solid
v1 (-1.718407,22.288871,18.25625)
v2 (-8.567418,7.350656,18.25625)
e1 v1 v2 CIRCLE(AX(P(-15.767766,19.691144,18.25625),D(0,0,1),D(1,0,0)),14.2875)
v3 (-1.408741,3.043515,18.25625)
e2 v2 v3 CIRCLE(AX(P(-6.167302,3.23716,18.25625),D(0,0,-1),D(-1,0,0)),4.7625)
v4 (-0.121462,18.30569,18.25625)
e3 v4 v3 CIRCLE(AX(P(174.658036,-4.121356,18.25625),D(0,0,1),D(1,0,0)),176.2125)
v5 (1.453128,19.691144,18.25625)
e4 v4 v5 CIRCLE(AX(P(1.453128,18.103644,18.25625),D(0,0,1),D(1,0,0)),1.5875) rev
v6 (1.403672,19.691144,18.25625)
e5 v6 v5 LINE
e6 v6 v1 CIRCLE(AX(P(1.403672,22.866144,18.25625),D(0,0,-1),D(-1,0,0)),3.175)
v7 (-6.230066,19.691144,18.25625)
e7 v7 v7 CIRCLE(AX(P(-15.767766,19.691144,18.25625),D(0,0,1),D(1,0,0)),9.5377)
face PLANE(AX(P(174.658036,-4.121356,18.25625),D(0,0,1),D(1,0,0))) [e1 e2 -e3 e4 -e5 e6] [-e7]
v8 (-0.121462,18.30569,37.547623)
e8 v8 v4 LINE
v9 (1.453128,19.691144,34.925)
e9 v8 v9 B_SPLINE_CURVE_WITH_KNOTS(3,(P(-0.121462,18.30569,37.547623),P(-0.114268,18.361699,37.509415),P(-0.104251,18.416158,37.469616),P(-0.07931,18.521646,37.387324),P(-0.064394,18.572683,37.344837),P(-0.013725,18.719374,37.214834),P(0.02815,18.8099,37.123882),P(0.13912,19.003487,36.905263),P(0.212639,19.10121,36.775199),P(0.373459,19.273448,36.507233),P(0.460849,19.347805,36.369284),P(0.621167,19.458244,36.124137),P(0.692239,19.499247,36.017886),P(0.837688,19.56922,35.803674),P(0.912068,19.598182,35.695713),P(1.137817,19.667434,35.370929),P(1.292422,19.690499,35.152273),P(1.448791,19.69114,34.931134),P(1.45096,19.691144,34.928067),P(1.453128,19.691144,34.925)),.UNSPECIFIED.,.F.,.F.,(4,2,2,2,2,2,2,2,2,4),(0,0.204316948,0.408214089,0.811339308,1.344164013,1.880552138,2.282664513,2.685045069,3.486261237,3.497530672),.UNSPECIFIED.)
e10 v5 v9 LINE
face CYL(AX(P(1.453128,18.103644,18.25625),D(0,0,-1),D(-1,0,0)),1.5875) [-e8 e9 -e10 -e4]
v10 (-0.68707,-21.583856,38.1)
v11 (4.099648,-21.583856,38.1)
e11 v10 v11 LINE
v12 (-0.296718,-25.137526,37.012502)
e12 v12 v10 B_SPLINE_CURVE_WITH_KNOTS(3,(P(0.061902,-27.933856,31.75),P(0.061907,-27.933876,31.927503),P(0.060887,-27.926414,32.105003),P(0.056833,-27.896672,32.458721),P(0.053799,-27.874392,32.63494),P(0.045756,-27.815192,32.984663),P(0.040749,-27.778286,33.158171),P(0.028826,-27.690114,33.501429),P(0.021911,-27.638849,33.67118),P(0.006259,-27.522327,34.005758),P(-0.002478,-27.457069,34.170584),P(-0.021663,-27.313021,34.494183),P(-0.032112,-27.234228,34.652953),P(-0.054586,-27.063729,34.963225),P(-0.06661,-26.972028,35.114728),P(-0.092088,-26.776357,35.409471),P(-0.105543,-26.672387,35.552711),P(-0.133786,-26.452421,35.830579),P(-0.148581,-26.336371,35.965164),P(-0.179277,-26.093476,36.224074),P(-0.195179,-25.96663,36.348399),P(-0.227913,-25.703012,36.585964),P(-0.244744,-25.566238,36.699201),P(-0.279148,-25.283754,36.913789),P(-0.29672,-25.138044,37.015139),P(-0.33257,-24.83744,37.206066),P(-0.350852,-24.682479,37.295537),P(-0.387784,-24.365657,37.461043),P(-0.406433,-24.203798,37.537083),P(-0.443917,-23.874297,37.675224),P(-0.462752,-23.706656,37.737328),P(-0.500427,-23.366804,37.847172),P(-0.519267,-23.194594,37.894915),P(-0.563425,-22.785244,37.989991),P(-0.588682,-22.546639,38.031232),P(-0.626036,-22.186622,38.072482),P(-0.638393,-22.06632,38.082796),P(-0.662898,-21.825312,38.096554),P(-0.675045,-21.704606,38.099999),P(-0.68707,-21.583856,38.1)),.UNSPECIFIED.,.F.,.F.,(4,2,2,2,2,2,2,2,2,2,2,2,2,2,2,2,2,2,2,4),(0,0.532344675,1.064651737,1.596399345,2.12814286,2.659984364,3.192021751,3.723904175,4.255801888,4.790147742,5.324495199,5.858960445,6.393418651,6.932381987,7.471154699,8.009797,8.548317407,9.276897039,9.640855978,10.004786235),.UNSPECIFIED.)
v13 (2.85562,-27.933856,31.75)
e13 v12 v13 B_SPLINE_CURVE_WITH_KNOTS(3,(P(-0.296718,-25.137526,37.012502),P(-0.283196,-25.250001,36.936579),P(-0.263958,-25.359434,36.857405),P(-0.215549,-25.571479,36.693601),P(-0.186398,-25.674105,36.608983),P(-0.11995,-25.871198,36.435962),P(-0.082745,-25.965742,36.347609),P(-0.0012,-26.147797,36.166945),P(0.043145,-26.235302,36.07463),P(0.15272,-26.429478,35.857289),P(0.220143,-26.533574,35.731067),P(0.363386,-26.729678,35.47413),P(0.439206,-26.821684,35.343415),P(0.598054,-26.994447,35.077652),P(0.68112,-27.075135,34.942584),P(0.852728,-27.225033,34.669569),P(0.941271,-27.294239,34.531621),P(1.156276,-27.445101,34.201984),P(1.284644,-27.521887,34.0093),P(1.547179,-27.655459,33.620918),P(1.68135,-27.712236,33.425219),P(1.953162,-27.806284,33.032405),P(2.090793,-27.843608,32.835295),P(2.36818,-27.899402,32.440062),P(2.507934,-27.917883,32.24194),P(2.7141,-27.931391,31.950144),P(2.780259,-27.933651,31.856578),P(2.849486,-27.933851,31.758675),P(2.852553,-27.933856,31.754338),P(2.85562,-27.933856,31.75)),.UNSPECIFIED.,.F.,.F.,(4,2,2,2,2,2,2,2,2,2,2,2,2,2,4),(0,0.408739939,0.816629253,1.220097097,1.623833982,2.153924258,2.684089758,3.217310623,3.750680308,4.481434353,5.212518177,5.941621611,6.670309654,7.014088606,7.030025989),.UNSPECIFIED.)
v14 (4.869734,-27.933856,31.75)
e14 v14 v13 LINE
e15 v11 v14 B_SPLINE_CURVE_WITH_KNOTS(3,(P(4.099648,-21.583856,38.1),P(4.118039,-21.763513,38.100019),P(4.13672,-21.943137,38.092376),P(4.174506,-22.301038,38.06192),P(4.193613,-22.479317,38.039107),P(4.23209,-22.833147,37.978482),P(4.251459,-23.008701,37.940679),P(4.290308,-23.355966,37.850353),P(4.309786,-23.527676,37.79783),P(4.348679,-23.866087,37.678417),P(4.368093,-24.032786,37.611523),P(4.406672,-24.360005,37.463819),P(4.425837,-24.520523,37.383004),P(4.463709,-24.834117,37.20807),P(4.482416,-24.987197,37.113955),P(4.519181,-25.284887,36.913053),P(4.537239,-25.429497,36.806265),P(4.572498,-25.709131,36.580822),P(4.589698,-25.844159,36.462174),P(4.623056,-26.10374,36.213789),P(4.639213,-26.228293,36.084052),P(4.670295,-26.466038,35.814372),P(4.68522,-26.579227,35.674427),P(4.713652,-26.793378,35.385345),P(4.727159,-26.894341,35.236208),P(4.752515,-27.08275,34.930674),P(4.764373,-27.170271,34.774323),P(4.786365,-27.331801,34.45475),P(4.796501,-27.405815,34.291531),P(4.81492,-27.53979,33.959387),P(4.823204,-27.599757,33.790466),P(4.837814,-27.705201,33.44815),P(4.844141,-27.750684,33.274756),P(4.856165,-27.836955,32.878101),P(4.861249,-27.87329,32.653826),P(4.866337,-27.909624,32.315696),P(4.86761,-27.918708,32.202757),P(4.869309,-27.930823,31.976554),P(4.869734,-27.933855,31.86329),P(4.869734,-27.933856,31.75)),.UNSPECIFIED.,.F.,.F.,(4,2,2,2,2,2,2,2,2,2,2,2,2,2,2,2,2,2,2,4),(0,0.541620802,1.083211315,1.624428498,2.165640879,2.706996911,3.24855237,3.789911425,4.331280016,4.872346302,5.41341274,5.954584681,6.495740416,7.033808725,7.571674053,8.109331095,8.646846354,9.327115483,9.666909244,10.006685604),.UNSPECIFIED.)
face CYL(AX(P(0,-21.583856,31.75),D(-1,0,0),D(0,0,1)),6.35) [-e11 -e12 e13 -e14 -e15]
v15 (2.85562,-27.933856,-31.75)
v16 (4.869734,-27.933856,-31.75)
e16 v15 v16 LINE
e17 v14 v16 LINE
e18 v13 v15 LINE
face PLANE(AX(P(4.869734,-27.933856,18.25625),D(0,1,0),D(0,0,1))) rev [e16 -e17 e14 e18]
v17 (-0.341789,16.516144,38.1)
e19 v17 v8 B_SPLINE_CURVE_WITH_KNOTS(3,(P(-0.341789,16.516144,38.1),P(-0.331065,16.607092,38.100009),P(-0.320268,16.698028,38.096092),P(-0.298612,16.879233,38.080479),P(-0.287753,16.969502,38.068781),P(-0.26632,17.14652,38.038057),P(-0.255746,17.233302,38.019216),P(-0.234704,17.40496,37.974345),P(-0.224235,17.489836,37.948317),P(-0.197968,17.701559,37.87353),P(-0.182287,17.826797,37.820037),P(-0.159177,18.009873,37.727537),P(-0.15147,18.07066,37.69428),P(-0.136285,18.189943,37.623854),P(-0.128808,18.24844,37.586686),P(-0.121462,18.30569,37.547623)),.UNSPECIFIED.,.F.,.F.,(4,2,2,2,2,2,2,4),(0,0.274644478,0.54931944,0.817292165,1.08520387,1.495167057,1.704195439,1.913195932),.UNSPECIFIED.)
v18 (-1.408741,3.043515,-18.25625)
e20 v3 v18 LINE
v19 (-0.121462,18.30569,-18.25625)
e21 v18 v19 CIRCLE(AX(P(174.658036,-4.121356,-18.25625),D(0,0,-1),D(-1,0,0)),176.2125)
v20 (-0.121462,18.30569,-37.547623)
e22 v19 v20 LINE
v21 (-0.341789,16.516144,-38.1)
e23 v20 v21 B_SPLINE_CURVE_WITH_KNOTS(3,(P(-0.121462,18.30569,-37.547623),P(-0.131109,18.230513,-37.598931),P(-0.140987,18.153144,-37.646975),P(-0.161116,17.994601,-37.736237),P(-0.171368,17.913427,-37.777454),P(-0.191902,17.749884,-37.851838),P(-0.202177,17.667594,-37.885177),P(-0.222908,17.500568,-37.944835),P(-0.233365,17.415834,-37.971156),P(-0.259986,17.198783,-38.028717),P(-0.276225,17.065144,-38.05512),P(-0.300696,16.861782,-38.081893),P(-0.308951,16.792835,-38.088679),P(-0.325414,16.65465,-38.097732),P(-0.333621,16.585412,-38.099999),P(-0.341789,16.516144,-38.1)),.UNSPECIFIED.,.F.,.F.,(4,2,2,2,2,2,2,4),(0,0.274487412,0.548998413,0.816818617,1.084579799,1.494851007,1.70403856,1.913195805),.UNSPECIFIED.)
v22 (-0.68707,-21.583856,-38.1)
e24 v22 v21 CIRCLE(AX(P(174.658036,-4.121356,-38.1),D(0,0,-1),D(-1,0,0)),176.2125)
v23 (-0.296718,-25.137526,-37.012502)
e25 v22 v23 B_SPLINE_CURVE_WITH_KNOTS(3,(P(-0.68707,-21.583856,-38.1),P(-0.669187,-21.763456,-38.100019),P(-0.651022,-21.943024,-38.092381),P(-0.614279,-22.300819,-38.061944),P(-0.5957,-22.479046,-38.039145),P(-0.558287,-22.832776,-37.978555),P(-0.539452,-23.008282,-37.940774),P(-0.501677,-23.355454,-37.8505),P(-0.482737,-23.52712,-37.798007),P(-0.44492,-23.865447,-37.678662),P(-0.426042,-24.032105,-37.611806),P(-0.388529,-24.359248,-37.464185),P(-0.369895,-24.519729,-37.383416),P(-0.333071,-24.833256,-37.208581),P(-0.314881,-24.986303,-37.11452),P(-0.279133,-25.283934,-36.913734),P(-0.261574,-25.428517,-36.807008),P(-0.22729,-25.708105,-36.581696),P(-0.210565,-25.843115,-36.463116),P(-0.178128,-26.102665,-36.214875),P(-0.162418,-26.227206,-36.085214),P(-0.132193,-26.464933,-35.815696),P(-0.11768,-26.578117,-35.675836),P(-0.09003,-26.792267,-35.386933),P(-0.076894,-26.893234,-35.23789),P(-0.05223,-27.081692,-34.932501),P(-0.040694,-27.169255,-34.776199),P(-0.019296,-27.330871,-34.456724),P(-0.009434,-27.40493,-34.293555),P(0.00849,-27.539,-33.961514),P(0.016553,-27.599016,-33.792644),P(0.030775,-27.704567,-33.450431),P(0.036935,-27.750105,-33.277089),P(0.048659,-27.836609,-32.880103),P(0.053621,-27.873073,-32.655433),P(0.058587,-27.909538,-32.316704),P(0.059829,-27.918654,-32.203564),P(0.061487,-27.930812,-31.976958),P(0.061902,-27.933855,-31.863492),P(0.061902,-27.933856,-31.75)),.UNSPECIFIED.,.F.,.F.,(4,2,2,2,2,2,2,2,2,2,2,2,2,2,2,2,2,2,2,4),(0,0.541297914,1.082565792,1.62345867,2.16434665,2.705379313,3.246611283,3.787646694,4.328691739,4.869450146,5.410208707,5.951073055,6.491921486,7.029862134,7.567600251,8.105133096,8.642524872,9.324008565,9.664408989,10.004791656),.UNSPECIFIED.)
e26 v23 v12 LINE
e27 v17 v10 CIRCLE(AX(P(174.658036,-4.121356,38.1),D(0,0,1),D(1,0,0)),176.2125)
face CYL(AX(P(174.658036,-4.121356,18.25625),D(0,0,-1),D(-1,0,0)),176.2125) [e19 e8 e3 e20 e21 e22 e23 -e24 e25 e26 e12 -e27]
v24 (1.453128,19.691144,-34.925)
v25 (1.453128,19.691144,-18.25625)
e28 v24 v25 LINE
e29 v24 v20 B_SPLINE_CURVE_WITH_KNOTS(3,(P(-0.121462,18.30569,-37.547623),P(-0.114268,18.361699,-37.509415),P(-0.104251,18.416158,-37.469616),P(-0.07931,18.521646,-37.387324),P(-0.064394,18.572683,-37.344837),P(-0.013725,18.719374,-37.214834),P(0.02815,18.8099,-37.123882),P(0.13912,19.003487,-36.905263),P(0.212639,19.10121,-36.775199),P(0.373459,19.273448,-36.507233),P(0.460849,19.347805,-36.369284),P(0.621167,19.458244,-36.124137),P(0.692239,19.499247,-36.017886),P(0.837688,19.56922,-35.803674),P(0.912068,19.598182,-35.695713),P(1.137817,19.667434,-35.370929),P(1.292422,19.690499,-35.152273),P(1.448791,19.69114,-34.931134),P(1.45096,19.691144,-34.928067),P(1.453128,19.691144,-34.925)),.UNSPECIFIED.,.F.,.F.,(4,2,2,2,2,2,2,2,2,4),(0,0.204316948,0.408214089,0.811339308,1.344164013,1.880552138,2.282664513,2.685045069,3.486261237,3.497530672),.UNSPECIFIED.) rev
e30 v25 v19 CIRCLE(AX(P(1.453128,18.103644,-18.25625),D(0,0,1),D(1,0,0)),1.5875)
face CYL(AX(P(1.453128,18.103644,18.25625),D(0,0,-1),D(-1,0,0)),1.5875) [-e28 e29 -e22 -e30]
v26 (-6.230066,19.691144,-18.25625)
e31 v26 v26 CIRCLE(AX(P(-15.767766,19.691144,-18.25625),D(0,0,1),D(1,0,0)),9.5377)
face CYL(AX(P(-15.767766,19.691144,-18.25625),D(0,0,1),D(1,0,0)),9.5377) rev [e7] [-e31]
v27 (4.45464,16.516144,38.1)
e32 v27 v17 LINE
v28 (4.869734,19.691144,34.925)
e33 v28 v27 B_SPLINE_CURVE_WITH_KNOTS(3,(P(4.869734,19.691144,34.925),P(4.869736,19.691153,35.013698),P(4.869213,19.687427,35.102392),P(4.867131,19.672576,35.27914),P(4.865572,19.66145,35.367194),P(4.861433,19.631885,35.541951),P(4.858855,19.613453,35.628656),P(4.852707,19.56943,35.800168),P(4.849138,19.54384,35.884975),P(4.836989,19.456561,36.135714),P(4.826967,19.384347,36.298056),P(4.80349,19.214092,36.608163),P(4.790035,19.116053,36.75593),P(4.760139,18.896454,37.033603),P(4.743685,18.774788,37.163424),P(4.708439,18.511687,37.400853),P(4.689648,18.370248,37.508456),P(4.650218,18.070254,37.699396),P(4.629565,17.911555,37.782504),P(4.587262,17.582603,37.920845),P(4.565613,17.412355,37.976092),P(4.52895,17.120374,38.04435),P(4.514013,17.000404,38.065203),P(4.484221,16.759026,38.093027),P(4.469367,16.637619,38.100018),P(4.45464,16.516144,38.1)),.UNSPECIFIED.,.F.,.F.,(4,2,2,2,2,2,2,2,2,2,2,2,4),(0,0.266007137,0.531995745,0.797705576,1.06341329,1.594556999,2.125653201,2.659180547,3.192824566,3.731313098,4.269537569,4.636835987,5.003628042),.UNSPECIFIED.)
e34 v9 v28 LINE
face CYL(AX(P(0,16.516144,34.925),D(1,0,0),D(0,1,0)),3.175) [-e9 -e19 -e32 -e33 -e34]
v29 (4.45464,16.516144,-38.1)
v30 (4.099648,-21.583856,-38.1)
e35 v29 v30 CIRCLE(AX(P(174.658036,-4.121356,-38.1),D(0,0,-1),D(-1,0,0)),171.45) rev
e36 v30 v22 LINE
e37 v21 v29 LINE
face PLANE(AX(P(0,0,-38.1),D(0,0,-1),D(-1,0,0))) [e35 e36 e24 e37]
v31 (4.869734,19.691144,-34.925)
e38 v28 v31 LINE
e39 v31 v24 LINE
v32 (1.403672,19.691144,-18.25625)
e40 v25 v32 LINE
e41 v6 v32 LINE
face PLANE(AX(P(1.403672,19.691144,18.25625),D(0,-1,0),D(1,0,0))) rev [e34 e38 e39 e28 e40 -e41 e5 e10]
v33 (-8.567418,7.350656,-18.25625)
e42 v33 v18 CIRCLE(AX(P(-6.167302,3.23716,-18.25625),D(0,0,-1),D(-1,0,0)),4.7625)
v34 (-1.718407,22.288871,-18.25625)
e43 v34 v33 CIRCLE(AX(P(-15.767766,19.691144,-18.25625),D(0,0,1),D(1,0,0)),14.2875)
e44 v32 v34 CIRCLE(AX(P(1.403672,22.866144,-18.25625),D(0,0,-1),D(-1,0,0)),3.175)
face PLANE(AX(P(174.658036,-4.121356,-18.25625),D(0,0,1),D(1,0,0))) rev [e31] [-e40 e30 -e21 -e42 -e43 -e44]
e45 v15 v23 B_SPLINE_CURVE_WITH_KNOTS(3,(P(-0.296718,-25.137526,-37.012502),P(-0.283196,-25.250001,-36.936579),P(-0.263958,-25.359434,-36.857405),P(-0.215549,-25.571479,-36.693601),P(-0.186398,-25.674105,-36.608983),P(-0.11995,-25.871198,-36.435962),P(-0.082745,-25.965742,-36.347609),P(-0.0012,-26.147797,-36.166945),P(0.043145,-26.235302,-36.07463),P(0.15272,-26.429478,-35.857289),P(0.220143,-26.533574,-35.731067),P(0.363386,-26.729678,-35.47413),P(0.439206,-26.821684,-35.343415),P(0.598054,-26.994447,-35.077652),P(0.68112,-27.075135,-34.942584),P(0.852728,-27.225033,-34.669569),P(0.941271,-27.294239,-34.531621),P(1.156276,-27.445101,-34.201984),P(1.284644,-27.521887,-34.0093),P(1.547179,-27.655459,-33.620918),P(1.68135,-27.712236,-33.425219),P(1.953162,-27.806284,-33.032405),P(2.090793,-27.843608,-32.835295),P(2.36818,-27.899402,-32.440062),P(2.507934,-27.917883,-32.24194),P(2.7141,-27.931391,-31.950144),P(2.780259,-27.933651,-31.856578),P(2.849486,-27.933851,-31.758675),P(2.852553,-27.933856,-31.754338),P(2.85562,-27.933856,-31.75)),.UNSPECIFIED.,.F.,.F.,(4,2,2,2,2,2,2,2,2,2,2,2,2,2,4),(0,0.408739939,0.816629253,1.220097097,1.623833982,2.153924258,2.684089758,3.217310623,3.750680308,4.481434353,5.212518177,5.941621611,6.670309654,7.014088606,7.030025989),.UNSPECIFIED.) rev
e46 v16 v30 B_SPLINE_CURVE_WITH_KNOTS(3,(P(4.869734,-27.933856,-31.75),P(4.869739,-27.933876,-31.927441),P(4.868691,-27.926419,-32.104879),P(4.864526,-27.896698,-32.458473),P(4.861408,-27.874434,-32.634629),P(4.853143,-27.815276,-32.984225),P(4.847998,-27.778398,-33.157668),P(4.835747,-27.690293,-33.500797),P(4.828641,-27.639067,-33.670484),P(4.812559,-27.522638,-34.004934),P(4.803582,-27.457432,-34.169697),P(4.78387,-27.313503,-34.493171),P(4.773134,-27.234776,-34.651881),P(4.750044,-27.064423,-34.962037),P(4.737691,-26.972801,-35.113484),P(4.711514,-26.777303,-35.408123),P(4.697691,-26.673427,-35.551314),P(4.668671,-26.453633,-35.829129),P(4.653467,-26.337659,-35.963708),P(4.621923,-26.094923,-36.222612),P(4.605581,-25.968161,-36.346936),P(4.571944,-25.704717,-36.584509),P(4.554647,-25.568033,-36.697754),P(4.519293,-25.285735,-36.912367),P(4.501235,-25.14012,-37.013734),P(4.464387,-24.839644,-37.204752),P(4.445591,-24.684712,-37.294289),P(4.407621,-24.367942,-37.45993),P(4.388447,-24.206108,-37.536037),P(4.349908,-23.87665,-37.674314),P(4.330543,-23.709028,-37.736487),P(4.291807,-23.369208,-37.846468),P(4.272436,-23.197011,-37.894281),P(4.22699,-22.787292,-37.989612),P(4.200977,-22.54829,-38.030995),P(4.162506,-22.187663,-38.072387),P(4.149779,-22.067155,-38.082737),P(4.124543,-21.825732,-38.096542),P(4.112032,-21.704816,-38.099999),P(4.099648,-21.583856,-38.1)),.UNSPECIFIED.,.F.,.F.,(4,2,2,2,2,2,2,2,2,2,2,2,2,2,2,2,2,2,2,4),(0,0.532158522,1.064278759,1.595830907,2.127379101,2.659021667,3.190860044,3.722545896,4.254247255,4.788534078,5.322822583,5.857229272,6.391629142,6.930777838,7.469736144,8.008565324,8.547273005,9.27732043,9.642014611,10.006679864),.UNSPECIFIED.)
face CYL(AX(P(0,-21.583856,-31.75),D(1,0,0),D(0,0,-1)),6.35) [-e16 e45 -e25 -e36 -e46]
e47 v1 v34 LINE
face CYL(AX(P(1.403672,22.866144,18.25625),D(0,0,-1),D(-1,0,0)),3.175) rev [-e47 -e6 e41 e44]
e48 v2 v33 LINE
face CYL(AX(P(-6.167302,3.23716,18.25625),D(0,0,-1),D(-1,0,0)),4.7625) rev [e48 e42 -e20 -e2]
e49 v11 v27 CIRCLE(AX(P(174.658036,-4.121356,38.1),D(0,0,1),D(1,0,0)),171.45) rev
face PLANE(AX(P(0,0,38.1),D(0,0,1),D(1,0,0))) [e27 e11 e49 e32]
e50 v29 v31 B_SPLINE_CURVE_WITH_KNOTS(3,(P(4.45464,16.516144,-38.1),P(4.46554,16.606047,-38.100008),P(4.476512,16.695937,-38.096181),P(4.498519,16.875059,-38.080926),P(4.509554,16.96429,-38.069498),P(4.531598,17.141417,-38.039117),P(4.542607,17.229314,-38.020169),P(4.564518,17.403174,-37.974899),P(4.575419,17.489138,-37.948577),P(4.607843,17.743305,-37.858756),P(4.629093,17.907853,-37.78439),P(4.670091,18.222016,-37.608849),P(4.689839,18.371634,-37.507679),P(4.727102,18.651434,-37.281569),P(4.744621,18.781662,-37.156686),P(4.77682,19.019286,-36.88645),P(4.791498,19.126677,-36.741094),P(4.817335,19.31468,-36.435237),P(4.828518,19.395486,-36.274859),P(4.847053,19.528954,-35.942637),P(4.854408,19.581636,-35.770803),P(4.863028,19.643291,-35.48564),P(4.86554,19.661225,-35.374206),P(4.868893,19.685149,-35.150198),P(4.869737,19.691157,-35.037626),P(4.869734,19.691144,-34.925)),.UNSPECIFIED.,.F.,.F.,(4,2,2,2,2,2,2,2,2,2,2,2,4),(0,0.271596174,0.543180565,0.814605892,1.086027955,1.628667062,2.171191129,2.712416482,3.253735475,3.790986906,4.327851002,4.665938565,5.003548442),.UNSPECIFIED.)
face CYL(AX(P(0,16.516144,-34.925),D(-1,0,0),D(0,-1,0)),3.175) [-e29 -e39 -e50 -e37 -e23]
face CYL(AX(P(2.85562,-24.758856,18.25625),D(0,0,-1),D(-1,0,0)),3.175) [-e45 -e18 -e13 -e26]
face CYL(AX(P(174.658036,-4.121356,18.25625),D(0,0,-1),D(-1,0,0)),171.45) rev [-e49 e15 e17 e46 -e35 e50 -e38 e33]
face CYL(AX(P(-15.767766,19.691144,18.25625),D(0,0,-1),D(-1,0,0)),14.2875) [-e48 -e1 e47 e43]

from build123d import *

# Parameters (mm, degrees)
BOSS_EXTRUDE1_DEPTH = 18.25625
SKETCH2_R           = 9.5377
CUT_EXTRUDE1_DEPTH  = 59.232550302
BOSS_EXTRUDE2_START = 19.84375
BOSS_EXTRUDE2_DEPTH = 19.84375
BOSS_EXTRUDE3_DEPTH = 19.84375
FILLET2_R           = 6.35
FILLET3_R           = 3.175
FILLET5_R           = 1.5875
FILLET6_R           = 3.175


with BuildPart() as part:
    # Sketch1 → Boss-Extrude1 (new, symmetric)
    with BuildSketch(Plane.XY):
        with BuildLine():
            Line((1.403672164, 19.691144131), (4.869734215, 19.691144131))
            ThreePointArc((4.869734215, 19.691144131), (3.208035766, -4.121355869), (4.869734215, -27.933855869))
            Line((4.869734215, -27.933855869), (0.061901788, -27.933855869))
            ThreePointArc((0.061901788, -27.933855869), (-1.356220949, -12.477586426), (-1.408740732, 3.043514659))
            ThreePointArc((-1.408740732, 3.043514659), (-3.712015543, 7.317965291), (-8.567418141, 7.350655889))
            ThreePointArc((-8.567418141, 7.350655889), (-28.755262527, 25.645771293), (-1.718407463, 22.288871403))
            ThreePointArc((-1.718407463, 22.288871403), (-0.627064659, 20.425502216), (1.403672164, 19.691144131))
        make_face()
    extrude(amount=BOSS_EXTRUDE1_DEPTH, both=True)

    # Sketch2 → Cut-Extrude1 (cut, through all)
    with BuildSketch(Plane.XY.offset(18.25625)):
        with Locations((-15.767765785, 19.691144131)):
            Circle(SKETCH2_R)
    extrude(amount=-CUT_EXTRUDE1_DEPTH, mode=Mode.SUBTRACT)

    # Sketch4 → Boss-Extrude2 (add)
    with BuildSketch(Plane.XY.offset(18.25625).offset(BOSS_EXTRUDE2_START)):
        with BuildLine():
            ThreePointArc((-1.408740732, 3.043514659), (-1.356220949, -12.477586426), (0.061901788, -27.933855869))
            Line((0.061901788, -27.933855869), (4.869734215, -27.933855869))
            ThreePointArc((4.869734215, -27.933855869), (3.208035766, -4.121355869), (4.869734215, 19.691144131))
            Line((4.869734215, 19.691144131), (1.403672164, 19.691144131))
            ThreePointArc((1.403672164, 19.691144131), (0.737132208, 19.761897123), (0.100299146, 19.971002722))
            ThreePointArc((0.100299146, 19.971002722), (-0.858408657, 11.525461487), (-1.408740732, 3.043514659))
        make_face()
    extrude(amount=-BOSS_EXTRUDE2_DEPTH)

    # Sketch5 → Boss-Extrude3 (add)
    with BuildSketch(Plane(origin=(0, 0, -18.25625), x_dir=(-1, 0, 0), z_dir=(0, 0, -1))):
        with BuildLine():
            ThreePointArc((-4.869734215, 19.691144131), (-3.208035766, -4.121355869), (-4.869734215, -27.933855869))
            Line((-4.869734215, -27.933855869), (-0.061901788, -27.933855869))
            ThreePointArc((-0.061901788, -27.933855869), (1.356220949, -12.477586426), (1.408740732, 3.043514659))
            ThreePointArc((1.408740732, 3.043514659), (0.858408657, 11.525461487), (-0.100299146, 19.971002722))
            ThreePointArc((-0.100299146, 19.971002722), (-0.737132208, 19.761897123), (-1.403672164, 19.691144131))
            Line((-1.403672164, 19.691144131), (-4.869734215, 19.691144131))
        make_face()
    extrude(amount=BOSS_EXTRUDE3_DEPTH)

    # Fillet2
    fillet2_edges = [part.edges().sort_by_distance(p)[0] for p in [
        (2.465818001, -27.933855869, 38.1),
        (2.465818001, -27.933855869, -38.1),
    ]]
    fillet(fillet2_edges, radius=FILLET2_R)

    # Fillet3
    # the kernel refuses this fillet: 3.175 mm, written as the material it takes off along each edge
    with BuildSketch(Plane(origin=(0.061901788, -27.933855869, 38.798080837), x_dir=(1, 0, 0), z_dir=(0, 0, -1))) as fillet3_piece_1:
        with BuildLine():
            CenterArc((2.793718395, -3.175), FILLET3_R, 90, 83.150253564)
            ThreePointArc((-0.358619505, -2.796330275), (-0.18490217, -1.39744793), (0, 0))
            Line((0, 0), (2.793718395, 0))
        make_face()
    extrude(amount=77.596161674, mode=Mode.SUBTRACT)

    # Fillet5
    # the kernel refuses this fillet: 1.5875 mm, written as the material it takes off along each edge
    with BuildSketch(Plane(origin=(0.100299146, 19.971002722, 42.300034066), x_dir=(-0.13199952505411708, -0.9912497795134622, 0), z_dir=(0, 0, -1)), Plane(origin=(0.100299146, 19.971002722, -18.25625), x_dir=(-0.1319995250540647, -0.9912497795134693, 0), z_dir=(0, 0, -1))) as fillet5_piece_1:
        with BuildLine():
            CenterArc((1.672445997, -1.587481962), FILLET5_R, 89.726869391, 82.687978074)
            Line((0.098836972, -1.377932716), (-0.05852393, -1.356977792))
            ThreePointArc((-0.05852393, -1.356977792), (-0.051995755, -1.307954493), (-0.152092645, -0.045490546))
            Line((-0.152092645, -0.045490546), (-0.000756763, 0.158748196))
            ThreePointArc((-0.000756763, 0.158748196), (0.840006813, 0.160752172), (1.680770389, 0.158748196))
            Line((1.680770389, 0.158748196), (1.680013626, 0))
        make_face()
    extrude(amount=24.043784066, mode=Mode.SUBTRACT)

    # Fillet6
    # the kernel refuses this fillet: 3.175 mm, written as the material it takes off along each edge
    with BuildSketch(Plane(origin=(12.807234215, 19.691144131, 38.1), x_dir=(0, -1, 0), z_dir=(-1, 0, 0)), Plane(origin=(-6.484371786, 19.691144131, -38.1), x_dir=(0, -1, 0), z_dir=(1, 0, 0))) as fillet6_piece_1:
        with BuildLine():
            CenterArc((FILLET6_R, -FILLET6_R), FILLET6_R, 90, 90)
            Line((0, -FILLET6_R), (0, 0))
            Line((0, 0), (FILLET6_R, 0))
        make_face()
    extrude(amount=19.291606, mode=Mode.SUBTRACT)


solid = part.part
